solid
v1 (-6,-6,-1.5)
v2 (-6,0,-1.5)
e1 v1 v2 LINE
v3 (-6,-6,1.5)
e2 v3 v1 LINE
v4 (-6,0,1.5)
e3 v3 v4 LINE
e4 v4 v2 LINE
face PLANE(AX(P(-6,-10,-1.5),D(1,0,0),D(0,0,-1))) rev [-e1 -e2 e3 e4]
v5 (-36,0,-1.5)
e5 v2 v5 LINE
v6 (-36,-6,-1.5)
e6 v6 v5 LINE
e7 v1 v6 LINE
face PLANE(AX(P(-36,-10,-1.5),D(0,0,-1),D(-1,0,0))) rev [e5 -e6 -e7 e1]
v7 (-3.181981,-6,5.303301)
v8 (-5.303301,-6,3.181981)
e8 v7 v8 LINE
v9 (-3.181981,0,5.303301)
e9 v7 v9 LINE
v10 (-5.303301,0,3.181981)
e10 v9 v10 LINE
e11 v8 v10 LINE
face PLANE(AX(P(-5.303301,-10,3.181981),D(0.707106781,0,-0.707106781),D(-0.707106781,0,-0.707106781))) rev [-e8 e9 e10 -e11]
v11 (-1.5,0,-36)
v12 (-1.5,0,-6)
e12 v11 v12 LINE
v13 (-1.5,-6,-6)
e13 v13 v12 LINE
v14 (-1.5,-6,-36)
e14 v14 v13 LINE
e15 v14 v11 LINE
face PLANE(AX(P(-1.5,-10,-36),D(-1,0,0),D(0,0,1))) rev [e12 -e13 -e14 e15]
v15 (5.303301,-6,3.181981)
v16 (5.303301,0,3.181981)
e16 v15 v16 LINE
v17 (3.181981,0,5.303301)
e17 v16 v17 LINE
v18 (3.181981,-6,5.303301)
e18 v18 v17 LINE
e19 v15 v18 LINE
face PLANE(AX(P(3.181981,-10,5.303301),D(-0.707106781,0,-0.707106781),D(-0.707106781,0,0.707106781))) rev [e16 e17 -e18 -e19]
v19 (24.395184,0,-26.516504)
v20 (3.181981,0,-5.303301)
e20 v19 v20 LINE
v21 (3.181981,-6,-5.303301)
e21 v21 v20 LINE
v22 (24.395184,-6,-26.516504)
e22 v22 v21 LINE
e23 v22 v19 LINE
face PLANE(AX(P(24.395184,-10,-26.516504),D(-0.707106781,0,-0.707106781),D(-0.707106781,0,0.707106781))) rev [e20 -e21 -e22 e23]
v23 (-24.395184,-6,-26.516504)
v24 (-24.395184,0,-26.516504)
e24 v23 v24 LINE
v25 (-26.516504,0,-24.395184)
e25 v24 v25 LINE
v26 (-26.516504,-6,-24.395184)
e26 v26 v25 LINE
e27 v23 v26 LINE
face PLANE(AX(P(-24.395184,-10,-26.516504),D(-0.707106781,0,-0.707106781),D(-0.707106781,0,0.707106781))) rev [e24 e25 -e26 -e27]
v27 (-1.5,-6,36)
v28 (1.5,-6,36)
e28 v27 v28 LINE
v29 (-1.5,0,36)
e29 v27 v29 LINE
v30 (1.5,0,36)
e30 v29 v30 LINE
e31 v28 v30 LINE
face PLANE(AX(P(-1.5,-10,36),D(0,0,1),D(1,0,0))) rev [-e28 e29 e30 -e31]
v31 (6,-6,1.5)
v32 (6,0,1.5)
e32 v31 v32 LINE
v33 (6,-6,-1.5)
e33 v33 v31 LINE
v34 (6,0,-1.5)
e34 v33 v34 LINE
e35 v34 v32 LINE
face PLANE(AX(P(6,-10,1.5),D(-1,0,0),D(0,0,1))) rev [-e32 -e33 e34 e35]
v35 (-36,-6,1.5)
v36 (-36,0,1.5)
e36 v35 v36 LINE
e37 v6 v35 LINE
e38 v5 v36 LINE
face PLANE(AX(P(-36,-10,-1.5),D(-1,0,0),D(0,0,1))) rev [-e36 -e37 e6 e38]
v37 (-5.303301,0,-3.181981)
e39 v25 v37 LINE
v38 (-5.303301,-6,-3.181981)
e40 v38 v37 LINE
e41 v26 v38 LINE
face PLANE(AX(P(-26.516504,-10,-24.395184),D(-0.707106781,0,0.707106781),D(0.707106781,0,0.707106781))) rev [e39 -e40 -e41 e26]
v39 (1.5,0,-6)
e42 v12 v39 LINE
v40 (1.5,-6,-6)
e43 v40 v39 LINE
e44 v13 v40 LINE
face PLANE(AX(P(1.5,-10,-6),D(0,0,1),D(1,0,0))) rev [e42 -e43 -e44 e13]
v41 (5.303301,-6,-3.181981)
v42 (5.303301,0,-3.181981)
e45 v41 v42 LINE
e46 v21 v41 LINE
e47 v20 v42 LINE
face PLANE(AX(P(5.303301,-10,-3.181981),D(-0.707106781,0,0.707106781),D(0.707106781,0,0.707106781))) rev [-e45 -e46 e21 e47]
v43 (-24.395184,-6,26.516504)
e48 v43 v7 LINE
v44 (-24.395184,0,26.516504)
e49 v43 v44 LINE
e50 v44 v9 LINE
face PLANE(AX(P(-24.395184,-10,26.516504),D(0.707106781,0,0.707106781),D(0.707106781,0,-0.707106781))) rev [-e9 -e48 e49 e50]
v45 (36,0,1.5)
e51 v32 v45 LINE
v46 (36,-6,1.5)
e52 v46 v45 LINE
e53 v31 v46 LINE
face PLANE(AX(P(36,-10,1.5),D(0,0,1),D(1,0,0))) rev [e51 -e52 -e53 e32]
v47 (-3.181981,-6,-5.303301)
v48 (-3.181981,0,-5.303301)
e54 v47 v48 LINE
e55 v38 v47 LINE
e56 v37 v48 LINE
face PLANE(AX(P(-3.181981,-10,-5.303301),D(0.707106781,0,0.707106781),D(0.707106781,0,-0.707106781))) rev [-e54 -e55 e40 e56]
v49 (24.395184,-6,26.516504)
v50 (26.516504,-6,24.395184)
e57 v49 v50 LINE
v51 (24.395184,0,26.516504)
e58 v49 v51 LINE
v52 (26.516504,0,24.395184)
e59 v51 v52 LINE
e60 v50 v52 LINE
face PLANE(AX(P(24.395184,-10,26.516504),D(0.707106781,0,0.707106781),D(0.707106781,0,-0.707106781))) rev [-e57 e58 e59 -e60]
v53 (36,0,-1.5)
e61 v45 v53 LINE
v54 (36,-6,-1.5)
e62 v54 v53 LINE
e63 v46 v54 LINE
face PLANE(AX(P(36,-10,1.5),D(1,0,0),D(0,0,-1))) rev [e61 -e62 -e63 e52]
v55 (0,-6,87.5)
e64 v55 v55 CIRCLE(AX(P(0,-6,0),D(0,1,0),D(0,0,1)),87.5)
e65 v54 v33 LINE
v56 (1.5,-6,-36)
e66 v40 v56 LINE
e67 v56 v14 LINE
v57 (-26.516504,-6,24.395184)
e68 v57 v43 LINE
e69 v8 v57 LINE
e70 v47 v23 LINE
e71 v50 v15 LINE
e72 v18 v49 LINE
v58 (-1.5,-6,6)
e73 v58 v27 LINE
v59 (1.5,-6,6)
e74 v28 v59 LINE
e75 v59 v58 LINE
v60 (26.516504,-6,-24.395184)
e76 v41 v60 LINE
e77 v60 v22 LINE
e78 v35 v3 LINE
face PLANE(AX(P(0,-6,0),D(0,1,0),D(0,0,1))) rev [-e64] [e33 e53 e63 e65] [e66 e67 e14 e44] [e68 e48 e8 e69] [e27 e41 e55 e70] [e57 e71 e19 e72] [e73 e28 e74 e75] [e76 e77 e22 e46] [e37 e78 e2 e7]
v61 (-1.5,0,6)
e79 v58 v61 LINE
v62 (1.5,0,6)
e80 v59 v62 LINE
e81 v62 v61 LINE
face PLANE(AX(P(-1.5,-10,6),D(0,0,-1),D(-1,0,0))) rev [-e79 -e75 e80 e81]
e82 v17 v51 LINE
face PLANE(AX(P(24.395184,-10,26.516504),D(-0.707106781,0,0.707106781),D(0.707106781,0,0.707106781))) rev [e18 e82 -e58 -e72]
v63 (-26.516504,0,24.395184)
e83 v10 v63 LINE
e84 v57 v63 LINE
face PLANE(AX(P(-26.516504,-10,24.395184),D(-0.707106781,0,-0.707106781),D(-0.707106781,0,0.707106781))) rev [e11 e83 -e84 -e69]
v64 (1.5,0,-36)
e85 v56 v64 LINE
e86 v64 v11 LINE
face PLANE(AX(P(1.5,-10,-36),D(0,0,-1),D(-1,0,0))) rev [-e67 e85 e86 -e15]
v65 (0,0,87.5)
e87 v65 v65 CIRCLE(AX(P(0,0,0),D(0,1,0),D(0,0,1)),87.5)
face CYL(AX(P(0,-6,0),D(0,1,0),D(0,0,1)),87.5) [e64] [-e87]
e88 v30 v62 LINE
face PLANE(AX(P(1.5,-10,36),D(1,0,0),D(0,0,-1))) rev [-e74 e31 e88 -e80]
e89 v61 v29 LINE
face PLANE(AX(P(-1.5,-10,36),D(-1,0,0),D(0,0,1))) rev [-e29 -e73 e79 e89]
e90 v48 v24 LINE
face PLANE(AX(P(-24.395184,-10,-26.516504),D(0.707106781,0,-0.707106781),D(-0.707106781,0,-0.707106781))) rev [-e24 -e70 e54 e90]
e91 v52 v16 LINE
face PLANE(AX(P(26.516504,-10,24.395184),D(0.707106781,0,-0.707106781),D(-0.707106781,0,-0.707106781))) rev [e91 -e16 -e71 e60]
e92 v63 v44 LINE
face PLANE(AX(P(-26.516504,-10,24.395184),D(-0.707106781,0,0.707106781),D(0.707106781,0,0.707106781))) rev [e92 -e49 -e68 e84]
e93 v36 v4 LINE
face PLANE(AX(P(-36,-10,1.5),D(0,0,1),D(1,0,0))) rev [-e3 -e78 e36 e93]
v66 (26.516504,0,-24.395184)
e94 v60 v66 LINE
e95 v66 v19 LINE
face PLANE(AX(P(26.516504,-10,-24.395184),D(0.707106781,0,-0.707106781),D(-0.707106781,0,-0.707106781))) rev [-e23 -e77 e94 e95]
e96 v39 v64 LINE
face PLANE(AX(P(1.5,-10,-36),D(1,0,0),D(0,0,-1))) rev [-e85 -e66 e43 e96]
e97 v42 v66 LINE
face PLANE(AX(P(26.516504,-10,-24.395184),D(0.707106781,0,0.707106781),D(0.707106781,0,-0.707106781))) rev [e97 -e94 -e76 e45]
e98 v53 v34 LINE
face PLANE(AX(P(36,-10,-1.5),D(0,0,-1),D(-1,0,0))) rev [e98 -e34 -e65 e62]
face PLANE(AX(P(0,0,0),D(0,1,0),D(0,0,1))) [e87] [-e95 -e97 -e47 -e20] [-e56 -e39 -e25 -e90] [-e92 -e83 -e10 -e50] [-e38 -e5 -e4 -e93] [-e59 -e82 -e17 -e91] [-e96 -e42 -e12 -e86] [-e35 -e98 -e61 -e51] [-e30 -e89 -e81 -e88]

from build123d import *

# Parameters (mm, degrees)
SKETCH1_R          = 87.5
BASE_FLANGE1_DEPTH = 6
SKETCH4_W          = 30
SKETCH4_H          = 3
CUT_EXTRUDE1_DEPTH = 10
CIRPATTERN1_COUNT  = 8


# Sheet-metal steps are written as plain solids
with BuildPart() as part:
    # Sketch1 → Base-Flange1 (new body)
    with BuildSketch(Plane(origin=(0, 0, 0), x_dir=(1, 0, 0), z_dir=(0, 1, 0))):
        with Locations(Location((0, 0, 0), (0, 0, 270))):
            Circle(SKETCH1_R)
    extrude(amount=-BASE_FLANGE1_DEPTH)

    # Sketch4 → Cut-Extrude1 (cut)
    with BuildSketch(Plane(origin=(0, 0, 0), x_dir=(1, 0, 0), z_dir=(0, 1, 0))):
        with Locations((-21, 0)):
            Rectangle(SKETCH4_W, SKETCH4_H)
    cut_extrude1 = extrude(amount=-CUT_EXTRUDE1_DEPTH, mode=Mode.SUBTRACT)

    # CirPattern1: Cut-Extrude1 ×8 about axis
    cirpattern1_axis = Axis((0, 0, 0), (0, 1, 0))
    for i in range(1, CIRPATTERN1_COUNT):
        add(cut_extrude1.rotate(cirpattern1_axis, i * 360 / CIRPATTERN1_COUNT), mode=Mode.SUBTRACT)


solid = part.part
